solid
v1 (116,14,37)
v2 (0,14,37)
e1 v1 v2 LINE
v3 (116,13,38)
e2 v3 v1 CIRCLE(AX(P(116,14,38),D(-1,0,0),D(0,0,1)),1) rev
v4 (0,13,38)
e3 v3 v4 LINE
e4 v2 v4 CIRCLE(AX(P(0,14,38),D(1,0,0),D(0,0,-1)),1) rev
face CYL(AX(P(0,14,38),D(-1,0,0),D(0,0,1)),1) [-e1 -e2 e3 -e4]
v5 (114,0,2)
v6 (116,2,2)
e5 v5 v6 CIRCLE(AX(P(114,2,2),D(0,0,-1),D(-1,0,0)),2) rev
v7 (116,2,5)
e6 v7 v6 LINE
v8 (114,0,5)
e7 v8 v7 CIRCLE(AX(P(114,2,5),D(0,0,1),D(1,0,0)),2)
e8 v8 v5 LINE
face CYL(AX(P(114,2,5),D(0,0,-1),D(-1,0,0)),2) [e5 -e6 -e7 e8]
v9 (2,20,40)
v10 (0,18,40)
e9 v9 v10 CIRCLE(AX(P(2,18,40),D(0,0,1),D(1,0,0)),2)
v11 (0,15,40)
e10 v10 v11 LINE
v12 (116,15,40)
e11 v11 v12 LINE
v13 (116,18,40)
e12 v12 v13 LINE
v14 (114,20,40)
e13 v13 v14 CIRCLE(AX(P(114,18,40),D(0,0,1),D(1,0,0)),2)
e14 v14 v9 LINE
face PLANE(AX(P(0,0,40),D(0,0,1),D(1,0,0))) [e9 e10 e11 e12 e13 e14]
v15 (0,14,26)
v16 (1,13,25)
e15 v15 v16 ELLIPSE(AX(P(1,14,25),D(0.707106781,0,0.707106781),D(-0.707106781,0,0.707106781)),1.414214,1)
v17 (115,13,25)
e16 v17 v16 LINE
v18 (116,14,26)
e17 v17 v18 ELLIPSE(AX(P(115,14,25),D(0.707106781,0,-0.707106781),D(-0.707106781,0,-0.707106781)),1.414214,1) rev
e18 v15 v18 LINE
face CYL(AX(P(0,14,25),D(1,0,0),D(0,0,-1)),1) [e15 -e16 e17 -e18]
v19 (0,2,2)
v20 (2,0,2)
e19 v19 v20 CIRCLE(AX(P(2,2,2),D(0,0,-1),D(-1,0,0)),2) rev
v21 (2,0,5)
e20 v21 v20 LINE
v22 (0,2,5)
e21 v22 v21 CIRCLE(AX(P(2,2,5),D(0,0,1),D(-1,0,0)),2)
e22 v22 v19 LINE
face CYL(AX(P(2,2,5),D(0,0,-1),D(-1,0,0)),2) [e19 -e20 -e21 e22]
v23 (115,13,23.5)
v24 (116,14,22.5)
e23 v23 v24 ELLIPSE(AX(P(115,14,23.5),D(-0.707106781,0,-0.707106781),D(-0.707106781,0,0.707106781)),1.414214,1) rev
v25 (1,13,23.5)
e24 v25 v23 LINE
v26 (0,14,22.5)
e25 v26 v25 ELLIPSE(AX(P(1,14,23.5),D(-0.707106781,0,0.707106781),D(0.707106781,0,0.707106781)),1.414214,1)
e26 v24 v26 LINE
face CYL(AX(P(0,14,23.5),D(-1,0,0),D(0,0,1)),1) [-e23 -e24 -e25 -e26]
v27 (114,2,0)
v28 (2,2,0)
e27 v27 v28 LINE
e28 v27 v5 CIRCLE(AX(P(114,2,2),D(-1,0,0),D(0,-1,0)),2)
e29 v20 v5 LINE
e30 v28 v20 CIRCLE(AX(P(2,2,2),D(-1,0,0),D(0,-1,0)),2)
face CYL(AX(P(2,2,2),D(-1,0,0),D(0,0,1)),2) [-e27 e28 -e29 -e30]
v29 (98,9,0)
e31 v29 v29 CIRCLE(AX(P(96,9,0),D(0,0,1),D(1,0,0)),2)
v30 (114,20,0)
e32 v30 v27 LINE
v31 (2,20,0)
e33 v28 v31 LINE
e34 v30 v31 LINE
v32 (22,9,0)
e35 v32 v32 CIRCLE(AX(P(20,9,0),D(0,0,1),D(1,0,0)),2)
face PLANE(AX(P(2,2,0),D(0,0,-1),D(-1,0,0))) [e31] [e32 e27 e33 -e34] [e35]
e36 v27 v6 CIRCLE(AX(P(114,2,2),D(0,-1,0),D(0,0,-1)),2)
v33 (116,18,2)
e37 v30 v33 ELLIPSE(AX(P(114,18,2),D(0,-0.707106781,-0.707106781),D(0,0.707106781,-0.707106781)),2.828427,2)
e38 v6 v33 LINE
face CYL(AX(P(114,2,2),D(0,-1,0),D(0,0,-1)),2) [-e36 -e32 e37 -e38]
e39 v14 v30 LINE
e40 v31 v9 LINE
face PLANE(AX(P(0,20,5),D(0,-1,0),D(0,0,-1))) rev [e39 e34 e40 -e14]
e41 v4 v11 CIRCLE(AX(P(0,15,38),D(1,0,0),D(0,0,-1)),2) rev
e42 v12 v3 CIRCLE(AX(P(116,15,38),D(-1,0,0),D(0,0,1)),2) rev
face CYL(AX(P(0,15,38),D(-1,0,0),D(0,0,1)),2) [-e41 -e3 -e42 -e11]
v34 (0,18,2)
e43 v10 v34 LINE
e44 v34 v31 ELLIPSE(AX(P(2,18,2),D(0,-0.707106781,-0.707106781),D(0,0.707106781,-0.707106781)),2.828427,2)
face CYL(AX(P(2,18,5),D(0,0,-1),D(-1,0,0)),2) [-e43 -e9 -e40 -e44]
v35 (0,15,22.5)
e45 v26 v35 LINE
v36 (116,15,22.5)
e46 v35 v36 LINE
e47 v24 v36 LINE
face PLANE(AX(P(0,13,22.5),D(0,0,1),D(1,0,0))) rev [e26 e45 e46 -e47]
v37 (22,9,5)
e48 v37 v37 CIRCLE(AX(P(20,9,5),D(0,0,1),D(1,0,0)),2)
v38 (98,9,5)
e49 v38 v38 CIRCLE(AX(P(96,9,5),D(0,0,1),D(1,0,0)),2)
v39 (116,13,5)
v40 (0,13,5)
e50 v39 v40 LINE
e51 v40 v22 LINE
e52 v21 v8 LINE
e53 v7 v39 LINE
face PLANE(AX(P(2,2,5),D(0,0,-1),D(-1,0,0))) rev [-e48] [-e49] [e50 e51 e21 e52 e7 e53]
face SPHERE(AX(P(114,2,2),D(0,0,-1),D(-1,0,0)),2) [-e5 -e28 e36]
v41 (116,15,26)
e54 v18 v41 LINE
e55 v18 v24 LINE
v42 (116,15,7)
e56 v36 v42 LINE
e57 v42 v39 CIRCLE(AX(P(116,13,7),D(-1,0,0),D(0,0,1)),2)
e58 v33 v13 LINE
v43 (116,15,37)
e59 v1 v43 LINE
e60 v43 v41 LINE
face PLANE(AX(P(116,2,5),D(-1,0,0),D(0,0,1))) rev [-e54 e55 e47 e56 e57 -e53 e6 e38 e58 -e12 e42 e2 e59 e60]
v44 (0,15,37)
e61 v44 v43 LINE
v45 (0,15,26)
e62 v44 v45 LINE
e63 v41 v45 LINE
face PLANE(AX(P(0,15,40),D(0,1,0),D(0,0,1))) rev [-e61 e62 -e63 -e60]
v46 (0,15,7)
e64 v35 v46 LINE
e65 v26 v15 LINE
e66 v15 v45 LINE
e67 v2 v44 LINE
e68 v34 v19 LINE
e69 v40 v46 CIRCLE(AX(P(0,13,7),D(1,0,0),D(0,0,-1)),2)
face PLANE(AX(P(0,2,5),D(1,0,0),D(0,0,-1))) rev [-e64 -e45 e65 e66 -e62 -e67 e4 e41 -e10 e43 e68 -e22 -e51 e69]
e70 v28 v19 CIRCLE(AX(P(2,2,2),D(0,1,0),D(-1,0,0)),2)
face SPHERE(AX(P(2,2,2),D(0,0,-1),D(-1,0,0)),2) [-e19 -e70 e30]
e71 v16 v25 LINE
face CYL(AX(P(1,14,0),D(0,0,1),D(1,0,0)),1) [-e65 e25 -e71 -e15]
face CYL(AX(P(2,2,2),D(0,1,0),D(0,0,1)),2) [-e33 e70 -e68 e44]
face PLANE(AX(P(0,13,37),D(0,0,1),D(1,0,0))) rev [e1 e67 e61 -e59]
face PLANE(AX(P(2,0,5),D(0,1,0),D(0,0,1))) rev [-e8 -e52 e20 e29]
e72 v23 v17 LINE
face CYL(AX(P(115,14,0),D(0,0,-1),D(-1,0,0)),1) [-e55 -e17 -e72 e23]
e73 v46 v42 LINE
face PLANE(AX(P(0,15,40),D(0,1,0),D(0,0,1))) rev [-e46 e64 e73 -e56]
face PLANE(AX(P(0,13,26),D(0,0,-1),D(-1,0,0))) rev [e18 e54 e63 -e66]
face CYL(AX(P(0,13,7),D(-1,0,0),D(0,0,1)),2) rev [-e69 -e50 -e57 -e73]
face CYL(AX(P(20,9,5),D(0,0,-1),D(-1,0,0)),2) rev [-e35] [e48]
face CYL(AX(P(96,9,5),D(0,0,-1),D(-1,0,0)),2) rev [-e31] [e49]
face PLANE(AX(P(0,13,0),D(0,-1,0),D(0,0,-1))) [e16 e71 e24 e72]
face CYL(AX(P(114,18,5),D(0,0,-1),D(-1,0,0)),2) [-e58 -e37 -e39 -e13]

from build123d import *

# Parameters (mm, degrees)
SKETCH1_R           = 2
BOSS_EXTRUDE1_DEPTH = 5
SKETCH2_W           = 116
SKETCH2_H           = 5
BOSS_EXTRUDE2_DEPTH = 35
SKETCH3_W           = 116
SKETCH3_H           = 3
SKETCH3_H_2         = 3.5
BOSS_EXTRUDE3_DEPTH = 2
FILLET1_R           = 2
FILLET2_R           = 1
FILLET3_R           = 2


with BuildPart() as part:
    # Sketch1 → Boss-Extrude1 (new body)
    with BuildSketch(Plane.XY):
        with BuildLine():
            Line((2, 0), (114, 0))
            ThreePointArc((114, 0), (115.414213562, 0.585786438), (116, 2))
            Line((116, 2), (116, 20))
            Line((116, 20), (0, 20))
            Line((0, 20), (0, 2))
            ThreePointArc((0, 2), (0.585786438, 0.585786438), (2, 0))
        make_face()
        with Locations((20, 9)):
            Circle(SKETCH1_R, mode=Mode.SUBTRACT)
        with Locations((96, 9)):
            Circle(SKETCH1_R, mode=Mode.SUBTRACT)
    extrude(amount=BOSS_EXTRUDE1_DEPTH)

    # Sketch2 → Boss-Extrude2 (add)
    with BuildSketch(Plane.XY.offset(5)):
        with Locations((58, 17.5)):
            Rectangle(SKETCH2_W, SKETCH2_H)
    extrude(amount=BOSS_EXTRUDE2_DEPTH)

    # Sketch3 → Boss-Extrude3 (add)
    with BuildSketch(Plane.XZ.offset(-15)):
        with Locations((58, 38.5)):
            Rectangle(SKETCH3_W, SKETCH3_H)
        with Locations((58, 24.25)):
            Rectangle(SKETCH3_W, SKETCH3_H_2)
    extrude(amount=BOSS_EXTRUDE3_DEPTH)

    # Fillet1
    fillet1_edges = [part.edges().sort_by_distance(p)[0] for p in [
        (0, 20, 20),
        (116, 20, 20),
        (58, 13, 40),
        (115.414213562, 0.585786438, 0),
        (58, 0, 0),
        (0.585786438, 0.585786438, 0),
        (0, 11, 0),
        (116, 11, 0),
    ]]
    fillet(fillet1_edges, radius=FILLET1_R)

    # Fillet2
    fillet2_edges = [part.edges().sort_by_distance(p)[0] for p in [
        (58, 13, 26),
        (116, 13, 24.25),
        (58, 13, 22.5),
        (0, 13, 24.25),
        (58, 13, 37),
    ]]
    fillet(fillet2_edges, radius=FILLET2_R - 0.0001)  # a hair under: the kernel refuses the full size

    # Fillet3
    fillet3_edges = [part.edges().sort_by_distance(p)[0] for p in [
        (58, 15, 5),
    ]]
    fillet(fillet3_edges, radius=FILLET3_R)


solid = part.part
